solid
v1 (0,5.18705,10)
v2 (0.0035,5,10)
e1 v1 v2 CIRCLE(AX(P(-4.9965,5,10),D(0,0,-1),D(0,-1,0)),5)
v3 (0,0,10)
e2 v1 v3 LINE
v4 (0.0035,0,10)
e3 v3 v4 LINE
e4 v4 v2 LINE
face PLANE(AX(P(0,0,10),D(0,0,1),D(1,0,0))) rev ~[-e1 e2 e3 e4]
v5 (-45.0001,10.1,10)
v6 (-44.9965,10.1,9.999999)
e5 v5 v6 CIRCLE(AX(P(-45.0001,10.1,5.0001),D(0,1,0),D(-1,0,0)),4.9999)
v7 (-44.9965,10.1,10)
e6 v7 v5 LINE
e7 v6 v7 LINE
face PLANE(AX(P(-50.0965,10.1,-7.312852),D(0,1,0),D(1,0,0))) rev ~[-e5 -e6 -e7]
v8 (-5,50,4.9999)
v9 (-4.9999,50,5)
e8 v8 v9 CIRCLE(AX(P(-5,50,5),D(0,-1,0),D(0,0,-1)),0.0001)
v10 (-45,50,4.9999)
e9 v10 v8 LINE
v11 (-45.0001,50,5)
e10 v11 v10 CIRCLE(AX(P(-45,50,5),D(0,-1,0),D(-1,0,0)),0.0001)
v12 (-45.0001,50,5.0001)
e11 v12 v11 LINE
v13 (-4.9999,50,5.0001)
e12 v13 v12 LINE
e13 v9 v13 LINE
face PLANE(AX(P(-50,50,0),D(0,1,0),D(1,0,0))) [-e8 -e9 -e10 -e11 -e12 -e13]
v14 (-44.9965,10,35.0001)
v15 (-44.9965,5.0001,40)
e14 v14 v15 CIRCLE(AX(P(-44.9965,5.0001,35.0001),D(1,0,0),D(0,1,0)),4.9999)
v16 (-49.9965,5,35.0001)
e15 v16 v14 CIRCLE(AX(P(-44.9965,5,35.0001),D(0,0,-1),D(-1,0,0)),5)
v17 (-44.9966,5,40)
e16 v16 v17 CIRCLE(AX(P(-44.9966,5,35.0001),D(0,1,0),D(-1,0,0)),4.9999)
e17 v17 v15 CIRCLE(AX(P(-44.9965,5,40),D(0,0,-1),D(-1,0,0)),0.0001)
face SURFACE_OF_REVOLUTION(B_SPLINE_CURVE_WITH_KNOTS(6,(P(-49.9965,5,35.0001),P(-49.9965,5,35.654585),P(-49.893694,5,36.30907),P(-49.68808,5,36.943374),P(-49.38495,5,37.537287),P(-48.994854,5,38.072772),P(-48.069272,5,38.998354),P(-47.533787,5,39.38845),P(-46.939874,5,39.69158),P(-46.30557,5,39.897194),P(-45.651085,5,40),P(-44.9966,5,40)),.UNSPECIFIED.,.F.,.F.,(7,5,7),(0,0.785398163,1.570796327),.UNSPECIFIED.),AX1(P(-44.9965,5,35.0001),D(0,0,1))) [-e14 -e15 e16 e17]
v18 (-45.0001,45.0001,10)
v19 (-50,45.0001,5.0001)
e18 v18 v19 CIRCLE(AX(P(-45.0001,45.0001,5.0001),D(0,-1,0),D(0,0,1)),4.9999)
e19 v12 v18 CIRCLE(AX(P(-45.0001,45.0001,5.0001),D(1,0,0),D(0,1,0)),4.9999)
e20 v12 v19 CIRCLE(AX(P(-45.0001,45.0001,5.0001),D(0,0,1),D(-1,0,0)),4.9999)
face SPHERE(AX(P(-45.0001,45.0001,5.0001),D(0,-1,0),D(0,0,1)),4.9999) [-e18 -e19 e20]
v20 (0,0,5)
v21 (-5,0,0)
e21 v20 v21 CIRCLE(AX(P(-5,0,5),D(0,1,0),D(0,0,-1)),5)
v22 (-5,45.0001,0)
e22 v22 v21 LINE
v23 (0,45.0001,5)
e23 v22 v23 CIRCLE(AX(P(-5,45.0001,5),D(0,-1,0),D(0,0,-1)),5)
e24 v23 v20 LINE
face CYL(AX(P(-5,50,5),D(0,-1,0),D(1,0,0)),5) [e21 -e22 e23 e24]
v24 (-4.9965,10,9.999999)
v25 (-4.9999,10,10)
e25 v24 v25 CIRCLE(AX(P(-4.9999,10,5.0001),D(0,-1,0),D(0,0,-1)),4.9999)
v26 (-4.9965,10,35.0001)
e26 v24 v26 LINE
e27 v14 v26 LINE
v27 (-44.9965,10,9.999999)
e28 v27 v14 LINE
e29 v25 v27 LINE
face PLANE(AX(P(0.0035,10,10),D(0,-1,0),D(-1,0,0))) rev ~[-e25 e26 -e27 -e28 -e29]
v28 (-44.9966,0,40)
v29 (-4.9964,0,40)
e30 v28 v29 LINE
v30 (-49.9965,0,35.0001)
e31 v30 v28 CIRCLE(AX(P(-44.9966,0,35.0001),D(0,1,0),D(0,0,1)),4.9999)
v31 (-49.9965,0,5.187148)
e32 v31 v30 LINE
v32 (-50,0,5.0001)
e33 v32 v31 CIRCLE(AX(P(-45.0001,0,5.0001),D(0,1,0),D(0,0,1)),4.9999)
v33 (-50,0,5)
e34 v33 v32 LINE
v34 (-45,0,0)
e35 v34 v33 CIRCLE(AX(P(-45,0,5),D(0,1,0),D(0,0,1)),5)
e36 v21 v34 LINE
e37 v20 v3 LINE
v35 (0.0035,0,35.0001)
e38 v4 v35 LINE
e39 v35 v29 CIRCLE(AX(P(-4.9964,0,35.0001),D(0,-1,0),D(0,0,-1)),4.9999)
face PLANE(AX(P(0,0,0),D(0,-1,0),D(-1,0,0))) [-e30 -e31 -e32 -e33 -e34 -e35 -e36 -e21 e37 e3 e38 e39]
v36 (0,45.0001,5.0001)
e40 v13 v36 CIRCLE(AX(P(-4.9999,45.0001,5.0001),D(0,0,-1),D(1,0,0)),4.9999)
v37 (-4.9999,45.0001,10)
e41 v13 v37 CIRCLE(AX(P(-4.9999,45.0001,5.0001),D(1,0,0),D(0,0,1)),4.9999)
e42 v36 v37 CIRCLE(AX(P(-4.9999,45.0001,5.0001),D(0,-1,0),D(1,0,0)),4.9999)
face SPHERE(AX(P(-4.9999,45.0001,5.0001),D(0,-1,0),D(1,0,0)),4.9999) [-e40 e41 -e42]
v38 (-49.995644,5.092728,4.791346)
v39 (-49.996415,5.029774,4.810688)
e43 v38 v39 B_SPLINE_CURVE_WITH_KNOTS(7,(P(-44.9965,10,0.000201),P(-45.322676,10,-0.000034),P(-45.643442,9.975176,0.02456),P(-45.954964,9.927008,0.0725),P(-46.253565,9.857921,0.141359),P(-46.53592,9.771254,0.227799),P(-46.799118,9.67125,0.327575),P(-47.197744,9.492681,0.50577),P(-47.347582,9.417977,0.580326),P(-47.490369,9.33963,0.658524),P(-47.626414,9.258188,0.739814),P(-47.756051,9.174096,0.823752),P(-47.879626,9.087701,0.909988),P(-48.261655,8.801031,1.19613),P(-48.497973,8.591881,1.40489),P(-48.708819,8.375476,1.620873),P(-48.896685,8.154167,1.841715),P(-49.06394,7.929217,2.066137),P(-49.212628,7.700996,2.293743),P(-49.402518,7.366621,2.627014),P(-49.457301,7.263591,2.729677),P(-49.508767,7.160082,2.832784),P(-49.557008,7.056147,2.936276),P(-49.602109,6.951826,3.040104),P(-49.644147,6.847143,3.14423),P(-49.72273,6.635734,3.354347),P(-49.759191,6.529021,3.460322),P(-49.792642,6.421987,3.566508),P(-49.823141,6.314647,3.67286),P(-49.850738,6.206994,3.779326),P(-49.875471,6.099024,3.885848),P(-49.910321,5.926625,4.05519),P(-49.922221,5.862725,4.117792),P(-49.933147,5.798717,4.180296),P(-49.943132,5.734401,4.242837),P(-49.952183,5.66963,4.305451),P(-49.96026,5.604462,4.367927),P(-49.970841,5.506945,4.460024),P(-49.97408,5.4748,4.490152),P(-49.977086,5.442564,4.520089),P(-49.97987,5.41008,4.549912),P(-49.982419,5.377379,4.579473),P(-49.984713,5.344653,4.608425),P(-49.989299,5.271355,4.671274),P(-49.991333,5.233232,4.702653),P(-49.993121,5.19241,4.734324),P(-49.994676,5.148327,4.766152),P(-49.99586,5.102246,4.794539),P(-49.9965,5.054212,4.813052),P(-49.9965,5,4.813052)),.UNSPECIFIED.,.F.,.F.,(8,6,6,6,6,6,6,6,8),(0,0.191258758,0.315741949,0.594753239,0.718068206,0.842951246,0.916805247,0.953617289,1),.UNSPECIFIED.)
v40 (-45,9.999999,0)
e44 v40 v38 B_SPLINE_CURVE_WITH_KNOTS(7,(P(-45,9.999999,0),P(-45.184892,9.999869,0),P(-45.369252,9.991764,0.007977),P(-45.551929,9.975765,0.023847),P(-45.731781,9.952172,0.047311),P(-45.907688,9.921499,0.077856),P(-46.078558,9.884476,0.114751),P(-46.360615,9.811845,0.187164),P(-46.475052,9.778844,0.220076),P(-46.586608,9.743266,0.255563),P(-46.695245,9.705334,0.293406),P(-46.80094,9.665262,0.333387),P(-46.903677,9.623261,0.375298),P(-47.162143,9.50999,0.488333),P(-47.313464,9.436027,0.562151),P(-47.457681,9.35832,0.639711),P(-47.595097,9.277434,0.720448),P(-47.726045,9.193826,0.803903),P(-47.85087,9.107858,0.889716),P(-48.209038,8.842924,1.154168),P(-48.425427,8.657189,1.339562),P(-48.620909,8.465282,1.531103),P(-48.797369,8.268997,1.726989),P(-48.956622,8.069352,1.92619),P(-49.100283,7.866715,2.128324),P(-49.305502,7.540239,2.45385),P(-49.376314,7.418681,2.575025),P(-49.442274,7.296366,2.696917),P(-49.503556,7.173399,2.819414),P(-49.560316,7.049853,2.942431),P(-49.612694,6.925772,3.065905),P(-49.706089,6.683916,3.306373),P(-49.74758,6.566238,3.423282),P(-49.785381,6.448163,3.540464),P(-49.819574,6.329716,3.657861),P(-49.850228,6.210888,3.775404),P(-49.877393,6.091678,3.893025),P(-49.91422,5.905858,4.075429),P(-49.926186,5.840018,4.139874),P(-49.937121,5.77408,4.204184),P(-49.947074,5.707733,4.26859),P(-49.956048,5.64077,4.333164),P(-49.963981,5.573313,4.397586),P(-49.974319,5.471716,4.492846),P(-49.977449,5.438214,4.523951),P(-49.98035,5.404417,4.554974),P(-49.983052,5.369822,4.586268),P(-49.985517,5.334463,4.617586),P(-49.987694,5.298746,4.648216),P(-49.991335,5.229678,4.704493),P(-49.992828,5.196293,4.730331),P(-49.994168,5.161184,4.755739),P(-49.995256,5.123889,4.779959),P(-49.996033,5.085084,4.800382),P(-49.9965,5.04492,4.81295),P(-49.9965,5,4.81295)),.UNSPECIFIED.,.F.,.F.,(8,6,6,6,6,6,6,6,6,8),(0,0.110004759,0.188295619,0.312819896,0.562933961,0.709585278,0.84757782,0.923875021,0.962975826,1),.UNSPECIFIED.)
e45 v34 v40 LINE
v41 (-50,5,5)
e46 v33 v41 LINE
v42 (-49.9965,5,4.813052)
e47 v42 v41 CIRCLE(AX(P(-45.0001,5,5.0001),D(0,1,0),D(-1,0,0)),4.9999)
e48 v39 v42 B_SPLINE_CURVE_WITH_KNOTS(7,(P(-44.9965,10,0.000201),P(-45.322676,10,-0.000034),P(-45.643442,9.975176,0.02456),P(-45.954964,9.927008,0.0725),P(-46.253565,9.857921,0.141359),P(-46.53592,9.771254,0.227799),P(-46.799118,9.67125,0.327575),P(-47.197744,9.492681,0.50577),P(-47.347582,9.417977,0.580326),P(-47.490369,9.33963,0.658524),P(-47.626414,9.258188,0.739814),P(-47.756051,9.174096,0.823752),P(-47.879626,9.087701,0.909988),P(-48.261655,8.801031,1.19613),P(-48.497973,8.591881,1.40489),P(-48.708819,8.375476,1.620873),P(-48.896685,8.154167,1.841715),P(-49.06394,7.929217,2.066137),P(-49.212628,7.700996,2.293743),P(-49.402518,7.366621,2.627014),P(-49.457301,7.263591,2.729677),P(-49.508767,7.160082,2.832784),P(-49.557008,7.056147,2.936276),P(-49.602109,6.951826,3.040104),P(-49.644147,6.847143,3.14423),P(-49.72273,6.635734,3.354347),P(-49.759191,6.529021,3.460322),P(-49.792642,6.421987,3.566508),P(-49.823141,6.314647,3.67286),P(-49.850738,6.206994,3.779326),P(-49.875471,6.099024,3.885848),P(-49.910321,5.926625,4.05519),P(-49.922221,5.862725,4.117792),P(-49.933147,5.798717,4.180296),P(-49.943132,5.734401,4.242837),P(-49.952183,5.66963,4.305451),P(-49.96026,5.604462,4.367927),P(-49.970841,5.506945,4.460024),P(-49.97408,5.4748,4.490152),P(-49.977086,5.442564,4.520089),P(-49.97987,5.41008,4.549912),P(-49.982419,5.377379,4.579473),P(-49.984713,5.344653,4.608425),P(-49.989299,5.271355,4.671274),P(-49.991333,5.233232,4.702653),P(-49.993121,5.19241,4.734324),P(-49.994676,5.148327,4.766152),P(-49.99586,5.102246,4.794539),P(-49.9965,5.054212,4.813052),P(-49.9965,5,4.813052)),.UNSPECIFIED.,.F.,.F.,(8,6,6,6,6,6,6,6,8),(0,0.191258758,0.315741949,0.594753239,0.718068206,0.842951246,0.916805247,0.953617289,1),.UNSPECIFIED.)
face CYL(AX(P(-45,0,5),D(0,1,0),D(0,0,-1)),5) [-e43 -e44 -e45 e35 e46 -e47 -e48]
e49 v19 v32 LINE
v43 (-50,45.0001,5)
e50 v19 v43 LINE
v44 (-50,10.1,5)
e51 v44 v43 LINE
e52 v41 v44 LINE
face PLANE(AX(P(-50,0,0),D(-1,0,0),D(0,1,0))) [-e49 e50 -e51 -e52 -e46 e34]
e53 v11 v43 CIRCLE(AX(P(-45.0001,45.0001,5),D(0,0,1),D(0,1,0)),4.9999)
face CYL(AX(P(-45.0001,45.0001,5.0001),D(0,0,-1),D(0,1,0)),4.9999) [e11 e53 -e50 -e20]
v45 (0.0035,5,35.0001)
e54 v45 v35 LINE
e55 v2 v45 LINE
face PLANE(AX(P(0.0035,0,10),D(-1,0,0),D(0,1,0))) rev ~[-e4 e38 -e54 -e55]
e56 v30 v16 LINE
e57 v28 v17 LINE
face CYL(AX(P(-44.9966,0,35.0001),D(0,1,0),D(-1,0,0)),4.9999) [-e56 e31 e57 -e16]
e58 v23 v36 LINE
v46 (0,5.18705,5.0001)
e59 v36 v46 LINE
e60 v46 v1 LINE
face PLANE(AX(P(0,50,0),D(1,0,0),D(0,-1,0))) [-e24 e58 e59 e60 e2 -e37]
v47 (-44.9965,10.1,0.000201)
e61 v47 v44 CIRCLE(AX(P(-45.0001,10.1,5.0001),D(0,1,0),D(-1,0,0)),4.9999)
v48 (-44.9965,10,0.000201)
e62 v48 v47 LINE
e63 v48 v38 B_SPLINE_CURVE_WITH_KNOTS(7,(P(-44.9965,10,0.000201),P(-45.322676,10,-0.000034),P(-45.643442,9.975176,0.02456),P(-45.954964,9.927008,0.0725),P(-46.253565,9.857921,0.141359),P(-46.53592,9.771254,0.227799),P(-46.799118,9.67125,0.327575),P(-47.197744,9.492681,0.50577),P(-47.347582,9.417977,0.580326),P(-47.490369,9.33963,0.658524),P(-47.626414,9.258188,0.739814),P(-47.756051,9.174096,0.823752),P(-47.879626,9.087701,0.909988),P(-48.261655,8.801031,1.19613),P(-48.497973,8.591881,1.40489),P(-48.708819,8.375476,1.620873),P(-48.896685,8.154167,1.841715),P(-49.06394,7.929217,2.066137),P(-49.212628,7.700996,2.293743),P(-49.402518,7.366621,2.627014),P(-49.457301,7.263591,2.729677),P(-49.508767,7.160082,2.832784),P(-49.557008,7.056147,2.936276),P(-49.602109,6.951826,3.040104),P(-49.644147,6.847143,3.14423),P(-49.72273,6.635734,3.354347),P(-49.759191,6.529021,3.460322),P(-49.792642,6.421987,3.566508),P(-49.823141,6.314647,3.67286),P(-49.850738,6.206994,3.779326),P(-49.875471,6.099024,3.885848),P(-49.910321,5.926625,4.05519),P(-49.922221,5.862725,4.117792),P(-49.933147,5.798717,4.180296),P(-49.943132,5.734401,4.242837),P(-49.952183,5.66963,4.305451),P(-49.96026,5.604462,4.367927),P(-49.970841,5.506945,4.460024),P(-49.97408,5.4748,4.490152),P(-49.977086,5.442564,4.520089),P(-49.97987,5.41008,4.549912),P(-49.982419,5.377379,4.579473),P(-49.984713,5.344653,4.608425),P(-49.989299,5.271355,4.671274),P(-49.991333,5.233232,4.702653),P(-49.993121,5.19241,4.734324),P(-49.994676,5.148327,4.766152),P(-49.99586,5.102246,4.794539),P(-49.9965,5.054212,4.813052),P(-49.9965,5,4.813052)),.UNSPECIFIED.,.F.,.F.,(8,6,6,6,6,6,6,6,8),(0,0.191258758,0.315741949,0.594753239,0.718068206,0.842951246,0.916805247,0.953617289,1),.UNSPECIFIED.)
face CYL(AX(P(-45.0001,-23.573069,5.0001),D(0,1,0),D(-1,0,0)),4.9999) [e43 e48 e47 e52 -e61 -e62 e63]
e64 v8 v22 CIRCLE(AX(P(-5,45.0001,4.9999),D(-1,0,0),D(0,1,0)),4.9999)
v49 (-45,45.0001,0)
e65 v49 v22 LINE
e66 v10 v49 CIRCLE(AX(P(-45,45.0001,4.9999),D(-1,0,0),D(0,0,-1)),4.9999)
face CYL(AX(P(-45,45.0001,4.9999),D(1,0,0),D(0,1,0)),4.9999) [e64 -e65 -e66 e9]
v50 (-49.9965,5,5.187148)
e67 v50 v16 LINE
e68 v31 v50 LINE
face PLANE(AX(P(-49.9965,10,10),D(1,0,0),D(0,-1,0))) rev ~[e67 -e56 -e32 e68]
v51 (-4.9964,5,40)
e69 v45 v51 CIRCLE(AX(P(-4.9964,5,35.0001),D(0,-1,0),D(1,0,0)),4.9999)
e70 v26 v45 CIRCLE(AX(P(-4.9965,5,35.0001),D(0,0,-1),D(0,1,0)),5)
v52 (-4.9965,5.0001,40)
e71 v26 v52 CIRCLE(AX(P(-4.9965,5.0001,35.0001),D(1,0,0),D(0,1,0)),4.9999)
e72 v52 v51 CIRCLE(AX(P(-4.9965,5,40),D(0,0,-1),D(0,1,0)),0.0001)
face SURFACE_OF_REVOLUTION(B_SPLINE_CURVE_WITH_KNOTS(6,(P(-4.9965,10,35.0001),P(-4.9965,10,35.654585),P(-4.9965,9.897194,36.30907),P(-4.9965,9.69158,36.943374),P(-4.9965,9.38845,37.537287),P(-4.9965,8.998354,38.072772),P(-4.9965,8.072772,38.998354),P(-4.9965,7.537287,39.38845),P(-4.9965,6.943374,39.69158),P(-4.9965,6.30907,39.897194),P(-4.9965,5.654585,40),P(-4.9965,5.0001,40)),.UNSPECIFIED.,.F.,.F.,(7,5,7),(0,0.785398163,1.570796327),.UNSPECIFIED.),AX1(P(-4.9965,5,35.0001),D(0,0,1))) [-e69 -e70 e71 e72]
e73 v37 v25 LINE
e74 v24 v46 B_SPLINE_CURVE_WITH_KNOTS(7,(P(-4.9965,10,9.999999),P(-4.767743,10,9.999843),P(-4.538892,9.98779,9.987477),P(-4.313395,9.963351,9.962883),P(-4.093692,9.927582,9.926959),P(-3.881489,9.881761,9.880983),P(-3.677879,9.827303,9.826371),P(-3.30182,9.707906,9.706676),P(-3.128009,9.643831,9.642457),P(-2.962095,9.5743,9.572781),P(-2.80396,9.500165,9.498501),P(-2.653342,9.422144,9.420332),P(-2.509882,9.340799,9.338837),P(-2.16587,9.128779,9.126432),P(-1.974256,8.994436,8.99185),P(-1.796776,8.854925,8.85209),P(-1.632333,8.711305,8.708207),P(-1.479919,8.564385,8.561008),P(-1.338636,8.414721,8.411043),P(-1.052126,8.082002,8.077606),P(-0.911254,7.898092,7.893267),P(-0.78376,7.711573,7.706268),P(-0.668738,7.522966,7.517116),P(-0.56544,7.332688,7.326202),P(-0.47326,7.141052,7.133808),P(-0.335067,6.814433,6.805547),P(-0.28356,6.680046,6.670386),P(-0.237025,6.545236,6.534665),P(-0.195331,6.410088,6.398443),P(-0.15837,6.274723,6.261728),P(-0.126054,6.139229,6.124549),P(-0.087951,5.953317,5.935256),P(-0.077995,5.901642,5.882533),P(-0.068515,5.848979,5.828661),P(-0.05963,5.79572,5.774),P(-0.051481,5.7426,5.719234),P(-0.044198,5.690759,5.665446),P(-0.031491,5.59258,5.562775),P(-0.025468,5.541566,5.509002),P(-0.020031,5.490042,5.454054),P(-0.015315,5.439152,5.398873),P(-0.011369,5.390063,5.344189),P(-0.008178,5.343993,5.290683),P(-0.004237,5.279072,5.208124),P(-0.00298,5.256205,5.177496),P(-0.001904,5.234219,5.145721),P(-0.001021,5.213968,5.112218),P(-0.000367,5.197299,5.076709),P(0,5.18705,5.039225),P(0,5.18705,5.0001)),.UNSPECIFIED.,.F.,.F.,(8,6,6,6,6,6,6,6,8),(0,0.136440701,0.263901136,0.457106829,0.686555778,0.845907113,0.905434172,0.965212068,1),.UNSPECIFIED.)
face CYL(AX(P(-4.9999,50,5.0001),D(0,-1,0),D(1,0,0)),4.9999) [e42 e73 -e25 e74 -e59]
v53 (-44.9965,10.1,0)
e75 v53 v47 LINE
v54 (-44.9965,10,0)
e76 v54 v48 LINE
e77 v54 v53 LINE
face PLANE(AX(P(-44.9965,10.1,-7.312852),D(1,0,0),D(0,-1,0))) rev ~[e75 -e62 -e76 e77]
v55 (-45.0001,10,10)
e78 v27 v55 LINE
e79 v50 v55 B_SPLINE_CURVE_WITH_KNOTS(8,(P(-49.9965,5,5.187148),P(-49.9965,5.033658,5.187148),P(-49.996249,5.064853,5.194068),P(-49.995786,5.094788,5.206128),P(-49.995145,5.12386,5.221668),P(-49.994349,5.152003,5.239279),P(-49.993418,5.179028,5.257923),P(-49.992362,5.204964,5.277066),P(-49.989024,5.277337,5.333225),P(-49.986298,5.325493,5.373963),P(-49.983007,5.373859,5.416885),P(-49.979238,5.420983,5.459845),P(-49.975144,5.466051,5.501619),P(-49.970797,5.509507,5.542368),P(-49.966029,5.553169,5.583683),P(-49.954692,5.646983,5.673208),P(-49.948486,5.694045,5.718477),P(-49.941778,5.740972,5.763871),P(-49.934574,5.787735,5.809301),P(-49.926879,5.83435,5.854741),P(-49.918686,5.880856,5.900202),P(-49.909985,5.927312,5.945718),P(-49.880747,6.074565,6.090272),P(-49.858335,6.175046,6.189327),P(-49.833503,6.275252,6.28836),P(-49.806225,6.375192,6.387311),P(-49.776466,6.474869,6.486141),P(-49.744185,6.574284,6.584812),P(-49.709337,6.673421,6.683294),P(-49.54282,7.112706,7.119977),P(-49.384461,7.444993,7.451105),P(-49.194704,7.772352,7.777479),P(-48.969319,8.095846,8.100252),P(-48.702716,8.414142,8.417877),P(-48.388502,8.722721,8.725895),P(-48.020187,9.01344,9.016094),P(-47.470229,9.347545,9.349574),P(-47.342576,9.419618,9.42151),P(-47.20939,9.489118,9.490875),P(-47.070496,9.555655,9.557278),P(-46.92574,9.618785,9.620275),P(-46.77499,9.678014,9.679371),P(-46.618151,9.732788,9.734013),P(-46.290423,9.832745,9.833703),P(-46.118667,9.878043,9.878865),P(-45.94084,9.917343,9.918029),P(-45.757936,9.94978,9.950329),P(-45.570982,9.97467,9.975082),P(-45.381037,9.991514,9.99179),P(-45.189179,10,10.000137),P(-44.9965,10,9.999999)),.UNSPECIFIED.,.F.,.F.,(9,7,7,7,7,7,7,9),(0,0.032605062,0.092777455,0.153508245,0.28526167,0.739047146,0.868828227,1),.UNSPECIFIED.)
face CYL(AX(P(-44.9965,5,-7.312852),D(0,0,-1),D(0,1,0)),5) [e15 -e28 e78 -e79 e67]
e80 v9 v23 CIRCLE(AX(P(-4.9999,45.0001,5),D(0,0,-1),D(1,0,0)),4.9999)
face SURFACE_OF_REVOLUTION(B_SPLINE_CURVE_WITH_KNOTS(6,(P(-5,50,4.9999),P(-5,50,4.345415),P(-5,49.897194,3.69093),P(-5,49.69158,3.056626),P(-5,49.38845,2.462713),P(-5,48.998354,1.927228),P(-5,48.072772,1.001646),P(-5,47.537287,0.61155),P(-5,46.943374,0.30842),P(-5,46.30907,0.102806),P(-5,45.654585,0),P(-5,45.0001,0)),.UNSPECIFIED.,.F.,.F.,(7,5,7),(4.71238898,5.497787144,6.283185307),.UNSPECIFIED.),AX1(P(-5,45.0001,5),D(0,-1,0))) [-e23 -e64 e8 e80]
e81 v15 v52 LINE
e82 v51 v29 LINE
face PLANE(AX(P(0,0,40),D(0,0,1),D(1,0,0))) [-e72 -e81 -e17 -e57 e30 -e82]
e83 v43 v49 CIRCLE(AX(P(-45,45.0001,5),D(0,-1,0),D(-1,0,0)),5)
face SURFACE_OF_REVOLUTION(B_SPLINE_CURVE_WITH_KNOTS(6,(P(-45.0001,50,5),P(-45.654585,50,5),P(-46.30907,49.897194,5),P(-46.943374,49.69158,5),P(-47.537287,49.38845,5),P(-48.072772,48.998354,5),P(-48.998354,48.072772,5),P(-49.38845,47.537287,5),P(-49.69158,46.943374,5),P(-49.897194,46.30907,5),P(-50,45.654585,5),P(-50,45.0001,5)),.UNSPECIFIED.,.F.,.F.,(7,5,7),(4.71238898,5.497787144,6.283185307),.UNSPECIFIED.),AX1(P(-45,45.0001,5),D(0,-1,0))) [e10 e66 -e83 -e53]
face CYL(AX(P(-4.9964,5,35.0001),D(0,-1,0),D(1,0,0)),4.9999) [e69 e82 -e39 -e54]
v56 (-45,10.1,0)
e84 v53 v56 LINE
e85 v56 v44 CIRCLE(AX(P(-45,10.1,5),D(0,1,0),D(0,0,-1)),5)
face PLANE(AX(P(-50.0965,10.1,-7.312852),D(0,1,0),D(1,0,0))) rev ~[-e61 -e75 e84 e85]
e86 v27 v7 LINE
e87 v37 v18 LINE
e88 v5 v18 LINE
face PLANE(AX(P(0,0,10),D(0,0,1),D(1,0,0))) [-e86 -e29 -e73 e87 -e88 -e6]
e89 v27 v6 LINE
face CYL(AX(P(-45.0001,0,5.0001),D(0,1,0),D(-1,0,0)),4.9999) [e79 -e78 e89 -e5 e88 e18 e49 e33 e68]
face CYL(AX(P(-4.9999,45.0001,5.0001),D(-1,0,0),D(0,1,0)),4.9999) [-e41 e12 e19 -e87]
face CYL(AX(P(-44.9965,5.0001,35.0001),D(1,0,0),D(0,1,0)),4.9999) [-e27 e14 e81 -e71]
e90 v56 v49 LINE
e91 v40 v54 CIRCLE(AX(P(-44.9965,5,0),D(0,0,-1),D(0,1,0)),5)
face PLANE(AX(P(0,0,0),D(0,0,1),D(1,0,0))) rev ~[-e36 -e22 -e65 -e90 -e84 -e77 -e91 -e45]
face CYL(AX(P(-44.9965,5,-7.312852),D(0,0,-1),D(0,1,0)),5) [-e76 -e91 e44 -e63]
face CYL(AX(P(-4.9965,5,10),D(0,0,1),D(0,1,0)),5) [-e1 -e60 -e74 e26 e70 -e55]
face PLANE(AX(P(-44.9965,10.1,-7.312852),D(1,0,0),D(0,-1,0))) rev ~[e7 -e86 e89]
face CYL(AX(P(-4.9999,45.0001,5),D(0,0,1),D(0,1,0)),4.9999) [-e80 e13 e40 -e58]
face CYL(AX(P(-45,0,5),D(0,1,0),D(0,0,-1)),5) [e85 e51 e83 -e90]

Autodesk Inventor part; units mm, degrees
ref_plane "YZ Plane" through (0, 0, 0) normal (1, 0, 0) x (0, 1, 0)
ref_plane "XZ Plane" through (0, 0, 0) normal (0, 1, 0) x (-1, 0, 0)
ref_plane "XY Plane" through (0, 0, 0) normal (0, 0, 1) x (1, 0, 0)
sketch "Sketch1" plane through (0, 0, 0) normal (0, 0, 1) x (1, 0, 0)
  line L0 (0, 0) -> (-50, 0)
  line L1 (-50, 0) -> (-50, 50)
  line L2 (-50, 50) -> (0, 50)
  line L3 (0, 50) -> (0, 0)
  dimension "d0" = 50
  dimension "d1" = 50
extrude "Extrusion1" add sketch "Sketch1" along normal blind 10
sketch "Sketch2" plane through (0, 0, 10) normal (0, 0, 1) x (1, 0, 0)
  line L0 (-49.9965, 0) -> (0.0035, 0)
  line L1 (0.0035, 0) -> (0.0035, 10)
  line L2 (0.0035, 10) -> (-49.9965, 10)
  line L3 (-49.9965, 10) -> (-49.9965, 0)
  point P0 (0, 0)
  dimension "d4" = 50
  dimension "d5" = 10
extrude "Extrusion2" add sketch "Sketch2" along normal blind 30
fillet "Fillet3" radius 5 6 edges at (-49.9965, 10, 25) (0.0035, 10, 25) (0, 30, 10) (-50, 25, 10) (-50, 25, 0) (0, 25, 0)
fillet "Fillet5" radius 5 11 edges at (-1.4609, 8.5355, 40) (-24.9965, 10, 40) (-48.532, 8.5355, 40) (-49.9965, 2.5, 40) (0.0035, 2.5, 40) (-1.4644, 50, 8.5356) (-48.5356, 50, 8.5356) (-1.4645, 50, 1.4645) (-48.5355, 50, 1.4645) (-25, 50, 0) (-25, 50, 10)
properties part number "Marker Holder 90 deg"
